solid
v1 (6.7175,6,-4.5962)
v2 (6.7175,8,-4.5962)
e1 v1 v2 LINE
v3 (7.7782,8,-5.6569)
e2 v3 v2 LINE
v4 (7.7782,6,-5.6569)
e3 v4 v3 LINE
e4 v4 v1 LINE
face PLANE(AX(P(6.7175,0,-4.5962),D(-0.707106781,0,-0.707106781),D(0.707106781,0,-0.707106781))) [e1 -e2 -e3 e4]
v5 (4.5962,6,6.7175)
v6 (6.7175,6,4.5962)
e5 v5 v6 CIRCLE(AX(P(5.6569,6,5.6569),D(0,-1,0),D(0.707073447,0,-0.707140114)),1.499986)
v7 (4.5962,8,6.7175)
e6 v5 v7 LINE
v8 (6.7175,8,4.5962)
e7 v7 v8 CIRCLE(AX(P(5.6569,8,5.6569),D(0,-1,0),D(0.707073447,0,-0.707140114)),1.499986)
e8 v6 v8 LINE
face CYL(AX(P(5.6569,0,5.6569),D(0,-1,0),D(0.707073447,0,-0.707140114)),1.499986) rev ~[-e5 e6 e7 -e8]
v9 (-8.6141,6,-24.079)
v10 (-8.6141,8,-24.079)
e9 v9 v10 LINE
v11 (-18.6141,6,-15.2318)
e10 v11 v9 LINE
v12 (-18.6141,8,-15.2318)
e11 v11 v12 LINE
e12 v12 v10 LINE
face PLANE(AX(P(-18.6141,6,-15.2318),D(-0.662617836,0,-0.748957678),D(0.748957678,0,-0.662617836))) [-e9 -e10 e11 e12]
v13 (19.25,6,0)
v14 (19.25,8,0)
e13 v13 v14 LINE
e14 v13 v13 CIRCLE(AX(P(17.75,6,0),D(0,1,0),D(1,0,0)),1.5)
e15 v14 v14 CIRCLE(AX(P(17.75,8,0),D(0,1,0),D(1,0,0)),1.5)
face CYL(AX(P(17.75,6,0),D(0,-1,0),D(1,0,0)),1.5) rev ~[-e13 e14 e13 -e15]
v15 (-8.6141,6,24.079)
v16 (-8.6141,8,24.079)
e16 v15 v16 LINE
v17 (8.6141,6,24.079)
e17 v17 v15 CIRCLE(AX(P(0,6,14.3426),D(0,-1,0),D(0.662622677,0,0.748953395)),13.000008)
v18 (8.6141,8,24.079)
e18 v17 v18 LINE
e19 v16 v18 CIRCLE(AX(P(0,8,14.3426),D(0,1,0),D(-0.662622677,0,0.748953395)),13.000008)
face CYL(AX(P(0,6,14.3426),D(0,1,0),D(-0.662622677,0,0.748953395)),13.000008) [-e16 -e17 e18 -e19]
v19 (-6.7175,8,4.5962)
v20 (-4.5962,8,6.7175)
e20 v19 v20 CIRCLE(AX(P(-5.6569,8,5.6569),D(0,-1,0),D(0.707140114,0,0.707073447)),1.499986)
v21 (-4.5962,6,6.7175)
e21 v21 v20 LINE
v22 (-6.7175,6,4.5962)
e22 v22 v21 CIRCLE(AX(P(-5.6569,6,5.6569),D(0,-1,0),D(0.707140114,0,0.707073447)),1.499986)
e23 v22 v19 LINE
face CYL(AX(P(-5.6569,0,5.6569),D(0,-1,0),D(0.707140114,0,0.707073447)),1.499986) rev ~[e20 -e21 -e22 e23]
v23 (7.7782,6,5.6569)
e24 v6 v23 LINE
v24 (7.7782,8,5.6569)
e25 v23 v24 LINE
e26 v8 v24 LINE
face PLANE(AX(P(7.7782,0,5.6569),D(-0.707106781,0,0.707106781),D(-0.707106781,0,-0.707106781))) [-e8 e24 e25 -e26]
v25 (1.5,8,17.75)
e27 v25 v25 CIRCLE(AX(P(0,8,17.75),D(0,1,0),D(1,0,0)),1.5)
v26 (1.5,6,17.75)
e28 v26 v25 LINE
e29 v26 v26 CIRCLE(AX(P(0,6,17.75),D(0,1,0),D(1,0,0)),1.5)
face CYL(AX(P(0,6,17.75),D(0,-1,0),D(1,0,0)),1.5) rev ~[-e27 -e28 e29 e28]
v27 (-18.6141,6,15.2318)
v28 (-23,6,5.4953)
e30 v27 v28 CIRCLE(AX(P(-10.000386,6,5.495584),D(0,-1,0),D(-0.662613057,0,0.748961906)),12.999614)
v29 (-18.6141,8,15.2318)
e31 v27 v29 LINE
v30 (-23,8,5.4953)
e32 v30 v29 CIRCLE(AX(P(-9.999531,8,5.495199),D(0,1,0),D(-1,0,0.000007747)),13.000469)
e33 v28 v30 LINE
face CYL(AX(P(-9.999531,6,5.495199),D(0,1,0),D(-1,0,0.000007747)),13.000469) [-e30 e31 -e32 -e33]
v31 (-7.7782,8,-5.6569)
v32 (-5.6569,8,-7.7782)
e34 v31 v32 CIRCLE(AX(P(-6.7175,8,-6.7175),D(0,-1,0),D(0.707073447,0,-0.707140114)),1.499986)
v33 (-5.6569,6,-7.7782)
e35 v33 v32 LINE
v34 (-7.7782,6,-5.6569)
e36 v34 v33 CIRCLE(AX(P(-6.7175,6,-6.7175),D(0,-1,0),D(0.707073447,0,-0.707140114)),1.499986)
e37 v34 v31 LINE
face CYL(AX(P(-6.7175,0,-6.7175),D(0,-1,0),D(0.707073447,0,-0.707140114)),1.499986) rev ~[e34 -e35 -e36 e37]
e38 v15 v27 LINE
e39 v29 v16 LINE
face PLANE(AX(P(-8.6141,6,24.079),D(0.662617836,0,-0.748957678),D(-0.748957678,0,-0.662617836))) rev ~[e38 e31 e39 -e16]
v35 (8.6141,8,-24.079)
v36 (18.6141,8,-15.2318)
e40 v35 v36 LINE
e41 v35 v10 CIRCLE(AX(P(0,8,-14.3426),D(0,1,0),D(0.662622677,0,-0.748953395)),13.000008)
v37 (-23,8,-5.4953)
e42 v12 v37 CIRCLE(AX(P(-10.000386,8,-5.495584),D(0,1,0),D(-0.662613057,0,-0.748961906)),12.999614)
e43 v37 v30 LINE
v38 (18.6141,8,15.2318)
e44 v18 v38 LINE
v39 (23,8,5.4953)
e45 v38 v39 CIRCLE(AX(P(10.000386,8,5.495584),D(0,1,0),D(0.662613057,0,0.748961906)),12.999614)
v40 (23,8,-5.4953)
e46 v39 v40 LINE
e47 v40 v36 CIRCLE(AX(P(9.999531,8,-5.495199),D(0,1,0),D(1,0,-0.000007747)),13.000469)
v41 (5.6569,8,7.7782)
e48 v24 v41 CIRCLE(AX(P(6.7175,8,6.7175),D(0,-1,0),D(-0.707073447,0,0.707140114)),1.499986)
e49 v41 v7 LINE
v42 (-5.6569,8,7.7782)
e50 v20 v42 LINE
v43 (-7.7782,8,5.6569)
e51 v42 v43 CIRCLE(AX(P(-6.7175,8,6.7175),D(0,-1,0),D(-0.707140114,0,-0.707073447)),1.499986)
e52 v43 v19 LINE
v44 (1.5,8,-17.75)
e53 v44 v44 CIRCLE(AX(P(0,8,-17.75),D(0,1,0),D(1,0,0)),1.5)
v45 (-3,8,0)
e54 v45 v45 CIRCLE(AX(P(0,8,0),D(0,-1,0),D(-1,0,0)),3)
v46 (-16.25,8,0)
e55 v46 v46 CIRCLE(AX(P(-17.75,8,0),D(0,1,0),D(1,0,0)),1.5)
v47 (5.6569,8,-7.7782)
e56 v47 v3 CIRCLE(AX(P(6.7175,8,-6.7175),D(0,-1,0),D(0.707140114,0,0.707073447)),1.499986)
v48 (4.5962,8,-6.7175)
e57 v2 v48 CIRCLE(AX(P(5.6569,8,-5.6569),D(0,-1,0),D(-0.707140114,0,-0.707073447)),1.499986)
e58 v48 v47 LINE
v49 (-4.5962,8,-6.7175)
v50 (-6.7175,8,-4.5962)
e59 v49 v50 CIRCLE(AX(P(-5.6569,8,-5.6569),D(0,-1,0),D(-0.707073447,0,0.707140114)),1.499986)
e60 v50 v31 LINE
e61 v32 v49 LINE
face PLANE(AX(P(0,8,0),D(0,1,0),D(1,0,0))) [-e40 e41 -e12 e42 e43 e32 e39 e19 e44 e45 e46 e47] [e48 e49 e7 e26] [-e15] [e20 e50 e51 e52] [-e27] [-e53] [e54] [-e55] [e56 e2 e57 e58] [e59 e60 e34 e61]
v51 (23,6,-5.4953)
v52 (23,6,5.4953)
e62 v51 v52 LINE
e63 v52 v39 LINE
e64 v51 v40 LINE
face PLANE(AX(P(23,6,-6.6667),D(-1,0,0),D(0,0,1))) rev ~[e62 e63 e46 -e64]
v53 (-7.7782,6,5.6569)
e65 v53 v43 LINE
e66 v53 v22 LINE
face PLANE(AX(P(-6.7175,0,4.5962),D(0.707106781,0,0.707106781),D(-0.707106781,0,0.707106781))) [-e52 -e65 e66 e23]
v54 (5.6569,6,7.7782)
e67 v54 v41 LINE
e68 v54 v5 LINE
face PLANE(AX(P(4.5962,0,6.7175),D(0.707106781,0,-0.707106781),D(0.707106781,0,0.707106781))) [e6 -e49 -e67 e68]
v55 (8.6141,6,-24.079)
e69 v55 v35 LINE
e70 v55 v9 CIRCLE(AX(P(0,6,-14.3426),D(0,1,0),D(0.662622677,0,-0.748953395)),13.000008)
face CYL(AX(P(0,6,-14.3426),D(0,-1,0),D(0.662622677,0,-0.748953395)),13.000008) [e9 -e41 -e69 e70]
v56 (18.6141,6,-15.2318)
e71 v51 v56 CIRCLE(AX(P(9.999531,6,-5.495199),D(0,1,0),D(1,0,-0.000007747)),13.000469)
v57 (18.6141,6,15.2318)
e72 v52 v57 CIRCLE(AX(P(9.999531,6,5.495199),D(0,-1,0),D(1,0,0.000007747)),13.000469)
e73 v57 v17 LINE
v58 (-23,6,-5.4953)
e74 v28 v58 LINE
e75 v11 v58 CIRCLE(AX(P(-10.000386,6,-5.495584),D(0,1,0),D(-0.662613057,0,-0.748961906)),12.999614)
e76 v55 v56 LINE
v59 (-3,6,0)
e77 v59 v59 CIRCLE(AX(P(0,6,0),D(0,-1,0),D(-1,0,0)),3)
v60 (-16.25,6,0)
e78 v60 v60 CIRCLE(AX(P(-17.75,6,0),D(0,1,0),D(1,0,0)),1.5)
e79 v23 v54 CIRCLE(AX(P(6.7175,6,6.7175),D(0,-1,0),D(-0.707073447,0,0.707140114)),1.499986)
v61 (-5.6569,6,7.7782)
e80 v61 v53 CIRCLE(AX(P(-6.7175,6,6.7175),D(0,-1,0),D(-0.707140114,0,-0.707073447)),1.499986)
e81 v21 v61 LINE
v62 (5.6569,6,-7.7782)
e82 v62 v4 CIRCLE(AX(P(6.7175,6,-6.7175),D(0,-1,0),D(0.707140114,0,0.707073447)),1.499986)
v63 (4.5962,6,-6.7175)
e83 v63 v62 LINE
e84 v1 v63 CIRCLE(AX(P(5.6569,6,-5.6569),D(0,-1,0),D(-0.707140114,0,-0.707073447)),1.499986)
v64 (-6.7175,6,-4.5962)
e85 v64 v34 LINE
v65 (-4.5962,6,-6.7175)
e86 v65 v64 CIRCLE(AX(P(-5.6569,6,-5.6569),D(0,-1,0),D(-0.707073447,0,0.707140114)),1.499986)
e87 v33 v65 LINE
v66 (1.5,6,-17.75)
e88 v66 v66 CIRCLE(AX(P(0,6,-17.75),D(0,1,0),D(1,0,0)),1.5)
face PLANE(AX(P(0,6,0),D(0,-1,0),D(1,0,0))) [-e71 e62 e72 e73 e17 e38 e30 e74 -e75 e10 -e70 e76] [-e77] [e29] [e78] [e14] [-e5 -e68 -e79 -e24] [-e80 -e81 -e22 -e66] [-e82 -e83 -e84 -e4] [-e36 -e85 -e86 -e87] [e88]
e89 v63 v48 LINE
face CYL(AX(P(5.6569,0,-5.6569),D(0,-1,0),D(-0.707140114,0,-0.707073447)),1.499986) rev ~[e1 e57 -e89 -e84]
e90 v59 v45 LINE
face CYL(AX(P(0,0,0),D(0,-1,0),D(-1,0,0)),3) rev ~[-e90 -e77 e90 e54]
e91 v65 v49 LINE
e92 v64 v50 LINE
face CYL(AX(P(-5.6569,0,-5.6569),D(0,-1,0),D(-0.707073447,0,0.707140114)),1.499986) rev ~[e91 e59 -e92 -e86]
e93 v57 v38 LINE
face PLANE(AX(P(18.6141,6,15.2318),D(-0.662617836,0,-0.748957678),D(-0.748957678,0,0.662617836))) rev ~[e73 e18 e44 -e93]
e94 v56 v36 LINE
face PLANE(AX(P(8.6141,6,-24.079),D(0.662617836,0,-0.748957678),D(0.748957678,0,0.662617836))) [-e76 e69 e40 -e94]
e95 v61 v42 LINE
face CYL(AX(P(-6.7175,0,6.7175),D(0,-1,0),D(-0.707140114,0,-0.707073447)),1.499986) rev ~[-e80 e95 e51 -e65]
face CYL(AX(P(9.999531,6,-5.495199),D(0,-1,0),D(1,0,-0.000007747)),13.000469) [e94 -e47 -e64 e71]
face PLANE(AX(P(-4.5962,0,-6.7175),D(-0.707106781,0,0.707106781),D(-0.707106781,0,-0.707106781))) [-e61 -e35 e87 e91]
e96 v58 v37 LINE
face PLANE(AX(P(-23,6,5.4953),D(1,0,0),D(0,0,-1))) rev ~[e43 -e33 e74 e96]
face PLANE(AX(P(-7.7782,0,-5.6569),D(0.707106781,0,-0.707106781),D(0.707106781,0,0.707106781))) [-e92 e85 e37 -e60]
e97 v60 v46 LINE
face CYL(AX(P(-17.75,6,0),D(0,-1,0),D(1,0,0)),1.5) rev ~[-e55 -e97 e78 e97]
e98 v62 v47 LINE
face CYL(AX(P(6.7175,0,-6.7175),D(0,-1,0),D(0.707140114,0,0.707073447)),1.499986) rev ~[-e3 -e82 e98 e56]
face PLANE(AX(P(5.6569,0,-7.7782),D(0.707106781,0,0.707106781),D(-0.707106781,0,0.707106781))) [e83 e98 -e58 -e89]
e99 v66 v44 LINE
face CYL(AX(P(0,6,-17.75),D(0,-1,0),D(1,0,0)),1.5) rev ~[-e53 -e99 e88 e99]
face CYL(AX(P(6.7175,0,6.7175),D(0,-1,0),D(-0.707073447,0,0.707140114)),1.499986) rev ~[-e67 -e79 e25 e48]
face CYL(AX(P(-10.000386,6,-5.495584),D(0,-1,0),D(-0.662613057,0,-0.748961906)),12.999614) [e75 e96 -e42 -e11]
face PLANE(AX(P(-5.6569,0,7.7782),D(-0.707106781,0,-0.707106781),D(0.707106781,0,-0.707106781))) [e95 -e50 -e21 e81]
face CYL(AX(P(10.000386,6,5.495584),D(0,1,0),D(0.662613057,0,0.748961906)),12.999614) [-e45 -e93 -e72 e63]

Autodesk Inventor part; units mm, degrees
ref_plane "YZ Plane" through (0, 0, 0) normal (1, 0, 0) x (0, 1, 0)
ref_plane "XZ Plane" through (0, 0, 0) normal (0, 1, 0) x (-1, 0, 0)
ref_plane "XY Plane" through (0, 0, 0) normal (0, 0, 1) x (1, 0, 0)
sketch "Sketch1" plane through (0, 0, 0) normal (0, 1, 0) x (-1, 0, 0)
  arc A0 (4.5962, 6.7175) -> (6.7175, 4.5962) centre (5.6569, 5.6569) ccw
  line L0 (5.6569, 7.7782) -> (4.5962, 6.7175)
  arc A1 (7.7782, 5.6569) -> (5.6569, 7.7782) centre (6.7175, 6.7175) ccw
  line L1 (6.7175, 4.5962) -> (7.7782, 5.6569)
  circle A2 centre (0, 0) radius 3
  circle A3 centre (0, -124.0736) radius 1.5
  circle A4 centre (0, -145.2868) radius 4
  arc A5 (-4.5962, -6.7175) -> (-6.7175, -4.5962) centre (-5.6569, -5.6569) ccw
  line L2 (-5.6569, -7.7782) -> (-4.5962, -6.7175)
  arc A6 (-7.7782, -5.6569) -> (-5.6569, -7.7782) centre (-6.7175, -6.7175) ccw
  line L3 (-6.7175, -4.5962) -> (-7.7782, -5.6569)
  line L4 (-20, 5.4953) -> (-20, -6.6667)
  arc A7 (-20, -6.6667) -> (-18, -12.6667) centre (-10, -6.6667) ccw
  line L5 (-18, -12.6667) -> (-14.5, -17.3333)
  arc A8 (-12.5, -23.3333) -> (-14.5, -17.3333) centre (-22.5, -23.3333) ccw
  line L6 (-12.5, -23.3333) -> (-12.5, -134.321)
  arc A9 (-12.5, -134.321) -> (-12.2297, -138.6622) centre (22.5, -134.321) ccw
  line L7 (-12.2297, -138.6622) -> (-10, -156.5)
  line L8 (-10, -156.5) -> (-10, -166.5)
  line L9 (-10, -166.5) -> (0, -166.5)
  line L10 (0, -166.5) -> (0, -156.5)
  line L11 (0, -156.5) -> (10, -156.5)
  line L12 (10, -156.5) -> (12.2297, -138.6622)
  arc A10 (12.2297, -138.6622) -> (12.5, -134.321) centre (-22.5, -134.321) ccw
  line L13 (12.5, -134.321) -> (12.5, -23.3333)
  arc A11 (14.5, -17.3333) -> (12.5, -23.3333) centre (22.5, -23.3333) ccw
  line L14 (14.5, -17.3333) -> (18, -12.6667)
  arc A12 (18, -12.6667) -> (20, -6.6667) centre (10, -6.6667) ccw
  line L15 (20, -6.6667) -> (20, 5.4953)
  arc A13 (20, 5.4953) -> (16.6262, 12.9849) centre (10, 5.4953) ccw
  line L16 (16.6262, 12.9849) -> (6.6262, 21.8321)
  arc A14 (6.6262, 21.8321) -> (-6.6262, 21.8321) centre (0, 14.3426) ccw
  line L17 (-6.6262, 21.8321) -> (-16.6262, 12.9849)
  arc A15 (-16.6262, 12.9849) -> (-20, 5.4953) centre (-10, 5.4953) ccw
  arc A16 (-6.7175, 4.5962) -> (-4.5962, 6.7175) centre (-5.6569, 5.6569) ccw
  line L18 (-7.7782, 5.6569) -> (-6.7175, 4.5962)
  arc A17 (-5.6569, 7.7782) -> (-7.7782, 5.6569) centre (-6.7175, 6.7175) ccw
  line L19 (-4.5962, 6.7175) -> (-5.6569, 7.7782)
  arc A18 (6.7175, -4.5962) -> (4.5962, -6.7175) centre (5.6569, -5.6569) ccw
  line L20 (7.7782, -5.6569) -> (6.7175, -4.5962)
  arc A19 (5.6569, -7.7782) -> (7.7782, -5.6569) centre (6.7175, -6.7175) ccw
  line L21 (4.5962, -6.7175) -> (5.6569, -7.7782)
  circle A20 centre (6, -136.5) radius 1.5
  circle A21 centre (-6, -136.5) radius 1.5
  point P0 (18, -12.6667)
  point P1 (16.6262, 12.9849)
  point P2 (6.6262, 21.8321)
  point P3 (-6.6262, 21.8321)
  point P4 (-16.6262, 12.9849)
  point P5 (-18, -12.6667)
  point P6 (-14.5, -17.3333)
  point P7 (-12.5, -23.3333)
  point P8 (-12.5, -134.321)
  point P9 (-12.2297, -138.6622)
  point P10 (12.2297, -138.6622)
  point P11 (12.5, -134.321)
  point P12 (12.5, -23.3333)
  point P13 (14.5, -17.3333)
  point P14 (-6.7175, -4.5962)
  point P15 (-4.5962, -6.7175)
  point P16 (-5.6569, -7.7782)
  point P17 (-7.7782, -5.6569)
  point P18 (7.7782, 5.6569)
  point P19 (6.7175, 4.5962)
  point P20 (4.5962, 6.7175)
  point P21 (5.6569, 7.7782)
  point P22 (-5.6569, 7.7782)
  point P23 (-4.5962, 6.7175)
  point P24 (-6.7175, 4.5962)
  point P25 (-7.7782, 5.6569)
  point P26 (6.7175, -4.5962)
  point P27 (7.7782, -5.6569)
  point P28 (5.6569, -7.7782)
  point P29 (4.5962, -6.7175)
extrude "Extrusion1" add sketch "Sketch1" along normal blind 6
sketch "Sketch2" plane through (0, 6, 0) normal (0, 1, 0) x (1, 0, 0)
  line L0 (20, -5.4953) -> (20, 6.6667) projected
  arc A0 (20, 6.6667) -> (18, 12.6667) centre (10, 6.6667) ccw projected
  line L1 (18, 12.6667) -> (14.5, 17.3333) projected
  arc A1 (12.5, 23.3333) -> (14.5, 17.3333) centre (22.5, 23.3333) ccw projected
  line L2 (12.5, 23.3333) -> (12.5, 134.321) projected
  arc A2 (12.5, 134.321) -> (12.2297, 138.6622) centre (-22.5, 134.321) ccw projected
  line L3 (12.2297, 138.6622) -> (10, 156.5) projected
  line L4 (10, 156.5) -> (10, 166.5) projected
  line L5 (10, 166.5) -> (0, 166.5) projected
  line L6 (0, 166.5) -> (0, 156.5) projected
  line L7 (0, 156.5) -> (-10, 156.5) projected
  line L8 (-10, 156.5) -> (-12.2297, 138.6622) projected
  arc A3 (-12.2297, 138.6622) -> (-12.5, 134.321) centre (22.5, 134.321) ccw projected
  line L9 (-12.5, 134.321) -> (-12.5, 23.3333) projected
  arc A4 (-14.5, 17.3333) -> (-12.5, 23.3333) centre (-22.5, 23.3333) ccw projected
  line L10 (-14.5, 17.3333) -> (-18, 12.6667) projected
  arc A5 (-18, 12.6667) -> (-20, 6.6667) centre (-10, 6.6667) ccw projected
  line L11 (-20, 6.6667) -> (-20, -5.4953) projected
  arc A6 (-20, -5.4953) -> (-16.6262, -12.9849) centre (-10, -5.4953) ccw projected
  line L12 (-16.6262, -12.9849) -> (-6.6262, -21.8321) projected
  arc A7 (-6.6262, -21.8321) -> (6.6262, -21.8321) centre (0, -14.3426) ccw projected
  line L13 (6.6262, -21.8321) -> (16.6262, -12.9849) projected
  arc A8 (16.6262, -12.9849) -> (20, -5.4953) centre (10, -5.4953) ccw projected
  circle A9 centre (0, 0) radius 3 projected
  circle A10 centre (0, 145.2868) radius 4 projected
  circle A11 centre (-6, 136.5) radius 1.5 projected
  circle A12 centre (6, 136.5) radius 1.5 projected
  circle A13 centre (0, 124.0736) radius 1.5 projected
  line L14 (7.7782, 5.6569) -> (6.7175, 4.5962) projected
  arc A14 (4.5962, 6.7175) -> (6.7175, 4.5962) centre (5.6569, 5.6569) ccw projected
  line L15 (4.5962, 6.7175) -> (5.6569, 7.7782) projected
  arc A15 (7.7782, 5.6569) -> (5.6569, 7.7782) centre (6.7175, 6.7175) ccw projected
  line L16 (-7.7782, -5.6569) -> (-6.7175, -4.5962) projected
  arc A16 (-4.5962, -6.7175) -> (-6.7175, -4.5962) centre (-5.6569, -5.6569) ccw projected
  line L17 (-4.5962, -6.7175) -> (-5.6569, -7.7782) projected
  arc A17 (-7.7782, -5.6569) -> (-5.6569, -7.7782) centre (-6.7175, -6.7175) ccw projected
  arc A18 (5.6569, -7.7782) -> (7.7782, -5.6569) centre (6.7175, -6.7175) ccw projected
  line L18 (5.6569, -7.7782) -> (4.5962, -6.7175) projected
  arc A19 (6.7175, -4.5962) -> (4.5962, -6.7175) centre (5.6569, -5.6569) ccw projected
  line L19 (6.7175, -4.5962) -> (7.7782, -5.6569) projected
  line L20 (-6.7175, 4.5962) -> (-7.7782, 5.6569) projected
  arc A20 (-5.6569, 7.7782) -> (-7.7782, 5.6569) centre (-6.7175, 6.7175) ccw projected
  line L21 (-5.6569, 7.7782) -> (-4.5962, 6.7175) projected
  arc A21 (-6.7175, 4.5962) -> (-4.5962, 6.7175) centre (-5.6569, 5.6569) ccw projected
  line L22 (18.6141, -15.2318) -> (8.6141, -24.079)
  arc A22 (-8.6141, -24.079) -> (8.6141, -24.079) centre (0, -14.3426) ccw
  line L23 (-8.6141, -24.079) -> (-18.6141, -15.2318)
  arc A23 (-23, -5.4953) -> (-18.6141, -15.2318) centre (-10, -5.4953) ccw
  line L24 (-23, -5.4953) -> (-23, 6.6667)
  arc A24 (-20.4, 14.4667) -> (-23, 6.6667) centre (-10, 6.6667) ccw
  line L25 (-20.4, 14.4667) -> (-12.5, 25)
  line L26 (-15.5, 23.3333) -> (-15.5, 134.321)
  arc A25 (-15.2066, 139.0343) -> (-15.5, 134.321) centre (22.5, 134.321) ccw
  line L27 (-15.2066, 139.0343) -> (-12.6483, 159.5)
  line L28 (-12.6483, 159.5) -> (-3, 159.5)
  line L29 (-3, 159.5) -> (-3, 169.5)
  line L30 (-3, 169.5) -> (13, 169.5)
  line L31 (13, 169.5) -> (13, 156.6868)
  line L32 (13, 156.6868) -> (15.2066, 139.0343)
  arc A26 (15.5, 134.321) -> (15.2066, 139.0343) centre (-22.5, 134.321) ccw
  line L33 (15.5, 134.321) -> (15.5, 23.3333)
  line L34 (12.5, 25) -> (20.4, 14.4667)
  arc A27 (23, 6.6667) -> (20.4, 14.4667) centre (10, 6.6667) ccw
  line L35 (23, 6.6667) -> (23, -5.4953)
  arc A28 (18.6141, -15.2318) -> (23, -5.4953) centre (10, -5.4953) ccw
  dimension "d2" = 3
extrude "Extrusion2" add sketch "Sketch2" against normal blind 6 contours L0 A0 L1 A1 L2 L34 A27 L35 A28 L22 A22 L23 A23 L24 A24 L25 L9 A4 L10 A5 L11 A6 L12 A7 L13 A8
sketch "Sketch3" plane through (0, 6, 0) normal (0, 1, 0) x (1, 0, 0)
  line L0 (12.5, 25) -> (12.5, 134.321) projected
  arc A0 (12.5, 134.321) -> (12.2297, 138.6622) centre (-22.5, 134.321) ccw projected
  line L1 (12.2297, 138.6622) -> (10, 156.5) projected
  line L2 (10, 156.5) -> (10, 166.5) projected
  line L3 (10, 166.5) -> (0, 166.5) projected
  line L4 (0, 166.5) -> (0, 156.5) projected
  line L5 (0, 156.5) -> (-10, 156.5) projected
  line L6 (-10, 156.5) -> (-12.2297, 138.6622) projected
  arc A1 (-12.2297, 138.6622) -> (-12.5, 134.321) centre (22.5, 134.321) ccw projected
  line L7 (-12.5, 134.321) -> (-12.5, 25) projected
  circle A2 centre (0, 0) radius 3 projected
  circle A3 centre (0, 145.2868) radius 4 projected
  circle A4 centre (-6, 136.5) radius 1.5 projected
  circle A5 centre (6, 136.5) radius 1.5 projected
  circle A6 centre (0, 124.0736) radius 1.5 projected
  line L8 (7.7782, 5.6569) -> (6.7175, 4.5962) projected
  arc A7 (4.5962, 6.7175) -> (6.7175, 4.5962) centre (5.6569, 5.6569) ccw projected
  line L9 (4.5962, 6.7175) -> (5.6569, 7.7782) projected
  arc A8 (7.7782, 5.6569) -> (5.6569, 7.7782) centre (6.7175, 6.7175) ccw projected
  line L10 (-7.7782, -5.6569) -> (-6.7175, -4.5962) projected
  arc A9 (-4.5962, -6.7175) -> (-6.7175, -4.5962) centre (-5.6569, -5.6569) ccw projected
  line L11 (-4.5962, -6.7175) -> (-5.6569, -7.7782) projected
  arc A10 (-7.7782, -5.6569) -> (-5.6569, -7.7782) centre (-6.7175, -6.7175) ccw projected
  arc A11 (5.6569, -7.7782) -> (7.7782, -5.6569) centre (6.7175, -6.7175) ccw projected
  line L12 (5.6569, -7.7782) -> (4.5962, -6.7175) projected
  arc A12 (6.7175, -4.5962) -> (4.5962, -6.7175) centre (5.6569, -5.6569) ccw projected
  line L13 (6.7175, -4.5962) -> (7.7782, -5.6569) projected
  line L14 (-6.7175, 4.5962) -> (-7.7782, 5.6569) projected
  arc A13 (-5.6569, 7.7782) -> (-7.7782, 5.6569) centre (-6.7175, 6.7175) ccw projected
  line L15 (-5.6569, 7.7782) -> (-4.5962, 6.7175) projected
  arc A14 (-6.7175, 4.5962) -> (-4.5962, 6.7175) centre (-5.6569, 5.6569) ccw projected
  line L16 (-12.5, 25) -> (-20.4, 14.4667) projected
  arc A15 (-20.4, 14.4667) -> (-23, 6.6667) centre (-10, 6.6667) ccw projected
  line L17 (-23, 6.6667) -> (-23, -5.4953) projected
  arc A16 (-23, -5.4953) -> (-18.6141, -15.2318) centre (-10, -5.4953) ccw projected
  line L18 (-18.6141, -15.2318) -> (-8.6141, -24.079) projected
  arc A17 (-8.6141, -24.079) -> (8.6141, -24.079) centre (0, -14.3426) ccw projected
  line L19 (8.6141, -24.079) -> (18.6141, -15.2318) projected
  arc A18 (18.6141, -15.2318) -> (23, -5.4953) centre (10, -5.4953) ccw projected
  line L20 (23, -5.4953) -> (23, 6.6667) projected
  arc A19 (23, 6.6667) -> (20.4, 14.4667) centre (10, 6.6667) ccw projected
  line L21 (20.4, 14.4667) -> (12.5, 25) projected
  circle A20 centre (-6.7175, -6.7175) radius 3 construction
  line L22 (0, 0) -> (-8.8388, -8.8388) construction
  circle A21 centre (0, 0) radius 12.5
  dimension "d8" = 6
fillet "Fillet1" radius 10 2 edges at (12.5, 3, -25) (-12.5, 3, -25)
extrude "Extrusion3" cut sketch "Sketch3" against normal blind 6 contours A21
sketch "Sketch4" plane through (0, 6, 0) normal (0, 1, 0) x (1, 0, 0)
  circle A0 centre (0, 0) radius 12.5 construction
  circle A1 centre (0, 0) radius 12.5 construction
  line L0 (12.5, 0) -> (23, 0) construction
  line L1 (23, -5.4953) -> (23, 6.6667) construction
  circle A2 centre (0, 0) radius 17.75 construction
  line L2 (0, -12.5) -> (0, -17.75) construction
  line L3 (-12.5, 0) -> (-17.75, 0) construction
  line L4 (0, 12.5) -> (0, 17.75) construction
  circle A3 centre (17.75, 0) radius 1.5
  circle A4 centre (0, 17.75) radius 1.5
  circle A5 centre (-17.75, 0) radius 1.5
  circle A6 centre (0, -17.75) radius 1.5
  dimension "d11" = 3
  dimension "d14" = 360
extrude "Extrusion4" cut sketch "Sketch4" against normal up to next
sketch "Sketch5" plane through (0, 6, 0) normal (0, 1, 0) x (1, 0, 0)
  circle A0 centre (0, -17.75) radius 1.5 projected
  circle A1 centre (17.75, 0) radius 1.5 projected
  circle A2 centre (-17.75, 0) radius 1.5 projected
  circle A3 centre (0, 17.75) radius 1.5 projected
  circle A4 centre (0, 0) radius 12.5 projected
  line L0 (12.5, 28.3333) -> (12.5, 134.321) projected
  arc A5 (12.5, 134.321) -> (12.2297, 138.6622) centre (-22.5, 134.321) ccw projected
  line L1 (12.2297, 138.6622) -> (10, 156.5) projected
  line L2 (10, 156.5) -> (10, 166.5) projected
  line L3 (10, 166.5) -> (0, 166.5) projected
  line L4 (0, 166.5) -> (0, 156.5) projected
  line L5 (0, 156.5) -> (-10, 156.5) projected
  line L6 (-10, 156.5) -> (-12.2297, 138.6622) projected
  arc A6 (-12.2297, 138.6622) -> (-12.5, 134.321) centre (22.5, 134.321) ccw projected
  line L7 (-12.5, 134.321) -> (-12.5, 28.3333) projected
  arc A7 (-14.5, 22.3333) -> (-12.5, 28.3333) centre (-22.5, 28.3333) ccw projected
  line L8 (-14.5, 22.3333) -> (-20.4, 14.4667) projected
  arc A8 (-20.4, 14.4667) -> (-23, 6.6667) centre (-10, 6.6667) ccw projected
  line L9 (-23, 6.6667) -> (-23, -5.4953) projected
  arc A9 (-23, -5.4953) -> (-18.6141, -15.2318) centre (-10, -5.4953) ccw projected
  line L10 (-18.6141, -15.2318) -> (-8.6141, -24.079) projected
  arc A10 (-8.6141, -24.079) -> (8.6141, -24.079) centre (0, -14.3426) ccw projected
  line L11 (8.6141, -24.079) -> (18.6141, -15.2318) projected
  arc A11 (18.6141, -15.2318) -> (23, -5.4953) centre (10, -5.4953) ccw projected
  line L12 (23, -5.4953) -> (23, 6.6667) projected
  arc A12 (23, 6.6667) -> (20.4, 14.4667) centre (10, 6.6667) ccw projected
  line L13 (20.4, 14.4667) -> (14.5, 22.3333) projected
  arc A13 (12.5, 28.3333) -> (14.5, 22.3333) centre (22.5, 28.3333) ccw projected
  circle A14 centre (0, 145.2868) radius 4 projected
  circle A15 centre (-6, 136.5) radius 1.5 projected
  circle A16 centre (6, 136.5) radius 1.5 projected
  circle A17 centre (0, 124.0736) radius 1.5 projected
  circle A18 centre (17.75, 0) radius 1.5 construction
  circle A19 centre (-17.75, 0) radius 1.5 construction
  line L14 (17.75, 0) -> (-17.75, 0) construction
  circle A20 centre (0, 17.75) radius 1.5
  arc A21 (-18.6141, 15.2318) -> (-23, 5.4953) centre (-10, 5.4953) ccw
  line L15 (-18.6141, 15.2318) -> (-8.6141, 24.079)
  arc A22 (8.6141, 24.079) -> (-8.6141, 24.079) centre (0, 14.3426) ccw
  line L16 (8.6141, 24.079) -> (18.6141, 15.2318)
  arc A23 (23, 5.4953) -> (18.6141, 15.2318) centre (10, 5.4953) ccw
  point P0 (-23, 5.4953)
  point P1 (23, 5.4953)
extrude "Extrusion5" add sketch "Sketch5" along normal blind 2 contours A4 | L12 A11 L11 A10 L10 A9 L9 A21 L15 A22 L16 A23
extrude "Extrusion6" cut sketch "Sketch1" along normal through all contours L0 A1 L1 A0 | A2 | L2 A6 L3 A5 | L18 A17 L19 A16 | L20 A19 L21 A18
sketch "Sketch6" plane through (0, 0, 0) normal (0, -1, 0) x (1, 0, 0)
  circle A0 centre (0, 17.75) radius 1.5 projected
  circle A1 centre (17.75, 0) radius 1.5 projected
  circle A2 centre (-17.75, 0) radius 1.5 projected
  circle A3 centre (0, -17.75) radius 1.5 projected
  circle A4 centre (0, 0) radius 12.5 projected
  line L0 (14.5, -22.3333) -> (20.4, -14.4667) projected
  arc A5 (20.4, -14.4667) -> (23, -6.6667) centre (10, -6.6667) ccw projected
  line L1 (23, -6.6667) -> (23, 5.4953) projected
  arc A6 (23, 5.4953) -> (18.6141, 15.2318) centre (10, 5.4953) ccw projected
  line L2 (18.6141, 15.2318) -> (8.6141, 24.079) projected
  arc A7 (8.6141, 24.079) -> (-8.6141, 24.079) centre (0, 14.3426) ccw projected
  line L3 (-8.6141, 24.079) -> (-18.6141, 15.2318) projected
  arc A8 (-18.6141, 15.2318) -> (-23, 5.4953) centre (-10, 5.4953) ccw projected
  line L4 (-23, 5.4953) -> (-23, -6.6667) projected
  arc A9 (-23, -6.6667) -> (-20.4, -14.4667) centre (-10, -6.6667) ccw projected
  line L5 (-20.4, -14.4667) -> (-14.5, -22.3333) projected
  arc A10 (-12.5, -28.3333) -> (-14.5, -22.3333) centre (-22.5, -28.3333) ccw projected
  line L6 (-12.5, -134.321) -> (-12.5, -28.3333) projected
  arc A11 (-12.5, -134.321) -> (-12.2297, -138.6622) centre (22.5, -134.321) ccw projected
  line L7 (-10, -156.5) -> (-12.2297, -138.6622) projected
  line L8 (0, -156.5) -> (-10, -156.5) projected
  line L9 (0, -166.5) -> (0, -156.5) projected
  line L10 (10, -166.5) -> (0, -166.5) projected
  line L11 (10, -156.5) -> (10, -166.5) projected
  line L12 (12.2297, -138.6622) -> (10, -156.5) projected
  arc A12 (12.2297, -138.6622) -> (12.5, -134.321) centre (-22.5, -134.321) ccw projected
  line L13 (12.5, -28.3333) -> (12.5, -134.321) projected
  arc A13 (14.5, -22.3333) -> (12.5, -28.3333) centre (22.5, -28.3333) ccw projected
  circle A14 centre (0, -145.2868) radius 4 projected
  circle A15 centre (-6, -136.5) radius 1.5 projected
  circle A16 centre (6, -136.5) radius 1.5 projected
  circle A17 centre (0, -124.0736) radius 1.5 projected
extrude "Extrusion7" cut sketch "Sketch6" against normal blind 6
sketch "Sketch7" plane through (0, 6, 0) normal (0, -1, 0) x (1, 0, 0)
  point P0 (0, 0)
sketch "Sketch8" plane through (0, 6, 0) normal (0, -1, 0) x (1, 0, 0)
  circle A0 centre (0, 0) radius 12.5 projected
  arc A1 (18.6141, -15.2318) -> (23, -5.4953) centre (10, -5.4953) ccw projected
  line L0 (23, 5.4953) -> (23, -5.4953) projected
  arc A2 (23, 5.4953) -> (18.6141, 15.2318) centre (10, 5.4953) ccw projected
  line L1 (8.6141, 24.079) -> (18.6141, 15.2318) projected
  arc A3 (8.6141, 24.079) -> (-8.6141, 24.079) centre (0, 14.3426) ccw projected
  line L2 (-18.6141, 15.2318) -> (-8.6141, 24.079) projected
  arc A4 (-18.6141, 15.2318) -> (-23, 5.4953) centre (-10, 5.4953) ccw projected
  line L3 (-23, -5.4953) -> (-23, 5.4953) projected
  arc A5 (-23, -5.4953) -> (-18.6141, -15.2318) centre (-10, -5.4953) ccw projected
  line L4 (-18.6141, -15.2318) -> (-8.6141, -24.079) projected
  arc A6 (-8.6141, -24.079) -> (8.6141, -24.079) centre (0, -14.3426) ccw projected
  line L5 (8.6141, -24.079) -> (18.6141, -15.2318) projected
  circle A7 centre (0, 17.75) radius 1.5 projected
  circle A8 centre (17.75, 0) radius 1.5 projected
  circle A9 centre (-17.75, 0) radius 1.5 projected
  circle A10 centre (0, -17.75) radius 1.5 projected
  line L6 (-5.6569, 7.7782) -> (-4.5962, 6.7175) projected
  arc A11 (-6.7175, 4.5962) -> (-4.5962, 6.7175) centre (-5.6569, 5.6569) ccw projected
  line L7 (-6.7175, 4.5962) -> (-7.7782, 5.6569) projected
  arc A12 (-5.6569, 7.7782) -> (-7.7782, 5.6569) centre (-6.7175, 6.7175) ccw projected
  line L8 (-7.7782, -5.6569) -> (-6.7175, -4.5962) projected
  arc A13 (-4.5962, -6.7175) -> (-6.7175, -4.5962) centre (-5.6569, -5.6569) ccw projected
  line L9 (-4.5962, -6.7175) -> (-5.6569, -7.7782) projected
  arc A14 (-7.7782, -5.6569) -> (-5.6569, -7.7782) centre (-6.7175, -6.7175) ccw projected
  line L10 (4.5962, 6.7175) -> (5.6569, 7.7782) projected
  arc A15 (7.7782, 5.6569) -> (5.6569, 7.7782) centre (6.7175, 6.7175) ccw projected
  line L11 (7.7782, 5.6569) -> (6.7175, 4.5962) projected
  arc A16 (4.5962, 6.7175) -> (6.7175, 4.5962) centre (5.6569, 5.6569) ccw projected
  line L12 (6.7175, -4.5962) -> (7.7782, -5.6569) projected
  arc A17 (5.6569, -7.7782) -> (7.7782, -5.6569) centre (6.7175, -6.7175) ccw projected
  line L13 (5.6569, -7.7782) -> (4.5962, -6.7175) projected
  arc A18 (6.7175, -4.5962) -> (4.5962, -6.7175) centre (5.6569, -5.6569) ccw projected
  circle A19 centre (0, 0) radius 3 projected
  arc A20 (18.6141, -15.2318) -> (23, -5.4953) centre (10, -5.4953) ccw projected
  line L14 (23, 5.4953) -> (23, -5.4953) projected
  arc A21 (23, 5.4953) -> (18.6141, 15.2318) centre (10, 5.4953) ccw projected
  line L15 (8.6141, 24.079) -> (18.6141, 15.2318) projected
  arc A22 (8.6141, 24.079) -> (-8.6141, 24.079) centre (0, 14.3426) ccw projected
  line L16 (-18.6141, 15.2318) -> (-8.6141, 24.079) projected
  arc A23 (-18.6141, 15.2318) -> (-23, 5.4953) centre (-10, 5.4953) ccw projected
  line L17 (-23, -5.4953) -> (-23, 5.4953) projected
  arc A24 (-23, -5.4953) -> (-18.6141, -15.2318) centre (-10, -5.4953) ccw projected
  line L18 (-18.6141, -15.2318) -> (-8.6141, -24.079) projected
  arc A25 (-8.6141, -24.079) -> (8.6141, -24.079) centre (0, -14.3426) ccw projected
  line L19 (8.6141, -24.079) -> (18.6141, -15.2318) projected
  circle A26 centre (0, 17.75) radius 1.5 projected
  circle A27 centre (17.75, 0) radius 1.5 projected
  circle A28 centre (-17.75, 0) radius 1.5 projected
  circle A29 centre (0, -17.75) radius 1.5 projected
  line L20 (-5.6569, 7.7782) -> (-4.5962, 6.7175) projected
  arc A30 (-6.7175, 4.5962) -> (-4.5962, 6.7175) centre (-5.6569, 5.6569) ccw projected
  line L21 (-6.7175, 4.5962) -> (-7.7782, 5.6569) projected
  arc A31 (-5.6569, 7.7782) -> (-7.7782, 5.6569) centre (-6.7175, 6.7175) ccw projected
  line L22 (-7.7782, -5.6569) -> (-6.7175, -4.5962) projected
  arc A32 (-4.5962, -6.7175) -> (-6.7175, -4.5962) centre (-5.6569, -5.6569) ccw projected
  line L23 (-4.5962, -6.7175) -> (-5.6569, -7.7782) projected
  arc A33 (-7.7782, -5.6569) -> (-5.6569, -7.7782) centre (-6.7175, -6.7175) ccw projected
  line L24 (4.5962, 6.7175) -> (5.6569, 7.7782) projected
  arc A34 (7.7782, 5.6569) -> (5.6569, 7.7782) centre (6.7175, 6.7175) ccw projected
  line L25 (7.7782, 5.6569) -> (6.7175, 4.5962) projected
  arc A35 (4.5962, 6.7175) -> (6.7175, 4.5962) centre (5.6569, 5.6569) ccw projected
  line L26 (6.7175, -4.5962) -> (7.7782, -5.6569) projected
  arc A36 (5.6569, -7.7782) -> (7.7782, -5.6569) centre (6.7175, -6.7175) ccw projected
  line L27 (5.6569, -7.7782) -> (4.5962, -6.7175) projected
  arc A37 (6.7175, -4.5962) -> (4.5962, -6.7175) centre (5.6569, -5.6569) ccw projected
  circle A38 centre (0, 0) radius 3 projected
extrude "Extrusion8" [suppressed]
properties part number "mod arm plate 2" material "Thermoplastic Resin"
